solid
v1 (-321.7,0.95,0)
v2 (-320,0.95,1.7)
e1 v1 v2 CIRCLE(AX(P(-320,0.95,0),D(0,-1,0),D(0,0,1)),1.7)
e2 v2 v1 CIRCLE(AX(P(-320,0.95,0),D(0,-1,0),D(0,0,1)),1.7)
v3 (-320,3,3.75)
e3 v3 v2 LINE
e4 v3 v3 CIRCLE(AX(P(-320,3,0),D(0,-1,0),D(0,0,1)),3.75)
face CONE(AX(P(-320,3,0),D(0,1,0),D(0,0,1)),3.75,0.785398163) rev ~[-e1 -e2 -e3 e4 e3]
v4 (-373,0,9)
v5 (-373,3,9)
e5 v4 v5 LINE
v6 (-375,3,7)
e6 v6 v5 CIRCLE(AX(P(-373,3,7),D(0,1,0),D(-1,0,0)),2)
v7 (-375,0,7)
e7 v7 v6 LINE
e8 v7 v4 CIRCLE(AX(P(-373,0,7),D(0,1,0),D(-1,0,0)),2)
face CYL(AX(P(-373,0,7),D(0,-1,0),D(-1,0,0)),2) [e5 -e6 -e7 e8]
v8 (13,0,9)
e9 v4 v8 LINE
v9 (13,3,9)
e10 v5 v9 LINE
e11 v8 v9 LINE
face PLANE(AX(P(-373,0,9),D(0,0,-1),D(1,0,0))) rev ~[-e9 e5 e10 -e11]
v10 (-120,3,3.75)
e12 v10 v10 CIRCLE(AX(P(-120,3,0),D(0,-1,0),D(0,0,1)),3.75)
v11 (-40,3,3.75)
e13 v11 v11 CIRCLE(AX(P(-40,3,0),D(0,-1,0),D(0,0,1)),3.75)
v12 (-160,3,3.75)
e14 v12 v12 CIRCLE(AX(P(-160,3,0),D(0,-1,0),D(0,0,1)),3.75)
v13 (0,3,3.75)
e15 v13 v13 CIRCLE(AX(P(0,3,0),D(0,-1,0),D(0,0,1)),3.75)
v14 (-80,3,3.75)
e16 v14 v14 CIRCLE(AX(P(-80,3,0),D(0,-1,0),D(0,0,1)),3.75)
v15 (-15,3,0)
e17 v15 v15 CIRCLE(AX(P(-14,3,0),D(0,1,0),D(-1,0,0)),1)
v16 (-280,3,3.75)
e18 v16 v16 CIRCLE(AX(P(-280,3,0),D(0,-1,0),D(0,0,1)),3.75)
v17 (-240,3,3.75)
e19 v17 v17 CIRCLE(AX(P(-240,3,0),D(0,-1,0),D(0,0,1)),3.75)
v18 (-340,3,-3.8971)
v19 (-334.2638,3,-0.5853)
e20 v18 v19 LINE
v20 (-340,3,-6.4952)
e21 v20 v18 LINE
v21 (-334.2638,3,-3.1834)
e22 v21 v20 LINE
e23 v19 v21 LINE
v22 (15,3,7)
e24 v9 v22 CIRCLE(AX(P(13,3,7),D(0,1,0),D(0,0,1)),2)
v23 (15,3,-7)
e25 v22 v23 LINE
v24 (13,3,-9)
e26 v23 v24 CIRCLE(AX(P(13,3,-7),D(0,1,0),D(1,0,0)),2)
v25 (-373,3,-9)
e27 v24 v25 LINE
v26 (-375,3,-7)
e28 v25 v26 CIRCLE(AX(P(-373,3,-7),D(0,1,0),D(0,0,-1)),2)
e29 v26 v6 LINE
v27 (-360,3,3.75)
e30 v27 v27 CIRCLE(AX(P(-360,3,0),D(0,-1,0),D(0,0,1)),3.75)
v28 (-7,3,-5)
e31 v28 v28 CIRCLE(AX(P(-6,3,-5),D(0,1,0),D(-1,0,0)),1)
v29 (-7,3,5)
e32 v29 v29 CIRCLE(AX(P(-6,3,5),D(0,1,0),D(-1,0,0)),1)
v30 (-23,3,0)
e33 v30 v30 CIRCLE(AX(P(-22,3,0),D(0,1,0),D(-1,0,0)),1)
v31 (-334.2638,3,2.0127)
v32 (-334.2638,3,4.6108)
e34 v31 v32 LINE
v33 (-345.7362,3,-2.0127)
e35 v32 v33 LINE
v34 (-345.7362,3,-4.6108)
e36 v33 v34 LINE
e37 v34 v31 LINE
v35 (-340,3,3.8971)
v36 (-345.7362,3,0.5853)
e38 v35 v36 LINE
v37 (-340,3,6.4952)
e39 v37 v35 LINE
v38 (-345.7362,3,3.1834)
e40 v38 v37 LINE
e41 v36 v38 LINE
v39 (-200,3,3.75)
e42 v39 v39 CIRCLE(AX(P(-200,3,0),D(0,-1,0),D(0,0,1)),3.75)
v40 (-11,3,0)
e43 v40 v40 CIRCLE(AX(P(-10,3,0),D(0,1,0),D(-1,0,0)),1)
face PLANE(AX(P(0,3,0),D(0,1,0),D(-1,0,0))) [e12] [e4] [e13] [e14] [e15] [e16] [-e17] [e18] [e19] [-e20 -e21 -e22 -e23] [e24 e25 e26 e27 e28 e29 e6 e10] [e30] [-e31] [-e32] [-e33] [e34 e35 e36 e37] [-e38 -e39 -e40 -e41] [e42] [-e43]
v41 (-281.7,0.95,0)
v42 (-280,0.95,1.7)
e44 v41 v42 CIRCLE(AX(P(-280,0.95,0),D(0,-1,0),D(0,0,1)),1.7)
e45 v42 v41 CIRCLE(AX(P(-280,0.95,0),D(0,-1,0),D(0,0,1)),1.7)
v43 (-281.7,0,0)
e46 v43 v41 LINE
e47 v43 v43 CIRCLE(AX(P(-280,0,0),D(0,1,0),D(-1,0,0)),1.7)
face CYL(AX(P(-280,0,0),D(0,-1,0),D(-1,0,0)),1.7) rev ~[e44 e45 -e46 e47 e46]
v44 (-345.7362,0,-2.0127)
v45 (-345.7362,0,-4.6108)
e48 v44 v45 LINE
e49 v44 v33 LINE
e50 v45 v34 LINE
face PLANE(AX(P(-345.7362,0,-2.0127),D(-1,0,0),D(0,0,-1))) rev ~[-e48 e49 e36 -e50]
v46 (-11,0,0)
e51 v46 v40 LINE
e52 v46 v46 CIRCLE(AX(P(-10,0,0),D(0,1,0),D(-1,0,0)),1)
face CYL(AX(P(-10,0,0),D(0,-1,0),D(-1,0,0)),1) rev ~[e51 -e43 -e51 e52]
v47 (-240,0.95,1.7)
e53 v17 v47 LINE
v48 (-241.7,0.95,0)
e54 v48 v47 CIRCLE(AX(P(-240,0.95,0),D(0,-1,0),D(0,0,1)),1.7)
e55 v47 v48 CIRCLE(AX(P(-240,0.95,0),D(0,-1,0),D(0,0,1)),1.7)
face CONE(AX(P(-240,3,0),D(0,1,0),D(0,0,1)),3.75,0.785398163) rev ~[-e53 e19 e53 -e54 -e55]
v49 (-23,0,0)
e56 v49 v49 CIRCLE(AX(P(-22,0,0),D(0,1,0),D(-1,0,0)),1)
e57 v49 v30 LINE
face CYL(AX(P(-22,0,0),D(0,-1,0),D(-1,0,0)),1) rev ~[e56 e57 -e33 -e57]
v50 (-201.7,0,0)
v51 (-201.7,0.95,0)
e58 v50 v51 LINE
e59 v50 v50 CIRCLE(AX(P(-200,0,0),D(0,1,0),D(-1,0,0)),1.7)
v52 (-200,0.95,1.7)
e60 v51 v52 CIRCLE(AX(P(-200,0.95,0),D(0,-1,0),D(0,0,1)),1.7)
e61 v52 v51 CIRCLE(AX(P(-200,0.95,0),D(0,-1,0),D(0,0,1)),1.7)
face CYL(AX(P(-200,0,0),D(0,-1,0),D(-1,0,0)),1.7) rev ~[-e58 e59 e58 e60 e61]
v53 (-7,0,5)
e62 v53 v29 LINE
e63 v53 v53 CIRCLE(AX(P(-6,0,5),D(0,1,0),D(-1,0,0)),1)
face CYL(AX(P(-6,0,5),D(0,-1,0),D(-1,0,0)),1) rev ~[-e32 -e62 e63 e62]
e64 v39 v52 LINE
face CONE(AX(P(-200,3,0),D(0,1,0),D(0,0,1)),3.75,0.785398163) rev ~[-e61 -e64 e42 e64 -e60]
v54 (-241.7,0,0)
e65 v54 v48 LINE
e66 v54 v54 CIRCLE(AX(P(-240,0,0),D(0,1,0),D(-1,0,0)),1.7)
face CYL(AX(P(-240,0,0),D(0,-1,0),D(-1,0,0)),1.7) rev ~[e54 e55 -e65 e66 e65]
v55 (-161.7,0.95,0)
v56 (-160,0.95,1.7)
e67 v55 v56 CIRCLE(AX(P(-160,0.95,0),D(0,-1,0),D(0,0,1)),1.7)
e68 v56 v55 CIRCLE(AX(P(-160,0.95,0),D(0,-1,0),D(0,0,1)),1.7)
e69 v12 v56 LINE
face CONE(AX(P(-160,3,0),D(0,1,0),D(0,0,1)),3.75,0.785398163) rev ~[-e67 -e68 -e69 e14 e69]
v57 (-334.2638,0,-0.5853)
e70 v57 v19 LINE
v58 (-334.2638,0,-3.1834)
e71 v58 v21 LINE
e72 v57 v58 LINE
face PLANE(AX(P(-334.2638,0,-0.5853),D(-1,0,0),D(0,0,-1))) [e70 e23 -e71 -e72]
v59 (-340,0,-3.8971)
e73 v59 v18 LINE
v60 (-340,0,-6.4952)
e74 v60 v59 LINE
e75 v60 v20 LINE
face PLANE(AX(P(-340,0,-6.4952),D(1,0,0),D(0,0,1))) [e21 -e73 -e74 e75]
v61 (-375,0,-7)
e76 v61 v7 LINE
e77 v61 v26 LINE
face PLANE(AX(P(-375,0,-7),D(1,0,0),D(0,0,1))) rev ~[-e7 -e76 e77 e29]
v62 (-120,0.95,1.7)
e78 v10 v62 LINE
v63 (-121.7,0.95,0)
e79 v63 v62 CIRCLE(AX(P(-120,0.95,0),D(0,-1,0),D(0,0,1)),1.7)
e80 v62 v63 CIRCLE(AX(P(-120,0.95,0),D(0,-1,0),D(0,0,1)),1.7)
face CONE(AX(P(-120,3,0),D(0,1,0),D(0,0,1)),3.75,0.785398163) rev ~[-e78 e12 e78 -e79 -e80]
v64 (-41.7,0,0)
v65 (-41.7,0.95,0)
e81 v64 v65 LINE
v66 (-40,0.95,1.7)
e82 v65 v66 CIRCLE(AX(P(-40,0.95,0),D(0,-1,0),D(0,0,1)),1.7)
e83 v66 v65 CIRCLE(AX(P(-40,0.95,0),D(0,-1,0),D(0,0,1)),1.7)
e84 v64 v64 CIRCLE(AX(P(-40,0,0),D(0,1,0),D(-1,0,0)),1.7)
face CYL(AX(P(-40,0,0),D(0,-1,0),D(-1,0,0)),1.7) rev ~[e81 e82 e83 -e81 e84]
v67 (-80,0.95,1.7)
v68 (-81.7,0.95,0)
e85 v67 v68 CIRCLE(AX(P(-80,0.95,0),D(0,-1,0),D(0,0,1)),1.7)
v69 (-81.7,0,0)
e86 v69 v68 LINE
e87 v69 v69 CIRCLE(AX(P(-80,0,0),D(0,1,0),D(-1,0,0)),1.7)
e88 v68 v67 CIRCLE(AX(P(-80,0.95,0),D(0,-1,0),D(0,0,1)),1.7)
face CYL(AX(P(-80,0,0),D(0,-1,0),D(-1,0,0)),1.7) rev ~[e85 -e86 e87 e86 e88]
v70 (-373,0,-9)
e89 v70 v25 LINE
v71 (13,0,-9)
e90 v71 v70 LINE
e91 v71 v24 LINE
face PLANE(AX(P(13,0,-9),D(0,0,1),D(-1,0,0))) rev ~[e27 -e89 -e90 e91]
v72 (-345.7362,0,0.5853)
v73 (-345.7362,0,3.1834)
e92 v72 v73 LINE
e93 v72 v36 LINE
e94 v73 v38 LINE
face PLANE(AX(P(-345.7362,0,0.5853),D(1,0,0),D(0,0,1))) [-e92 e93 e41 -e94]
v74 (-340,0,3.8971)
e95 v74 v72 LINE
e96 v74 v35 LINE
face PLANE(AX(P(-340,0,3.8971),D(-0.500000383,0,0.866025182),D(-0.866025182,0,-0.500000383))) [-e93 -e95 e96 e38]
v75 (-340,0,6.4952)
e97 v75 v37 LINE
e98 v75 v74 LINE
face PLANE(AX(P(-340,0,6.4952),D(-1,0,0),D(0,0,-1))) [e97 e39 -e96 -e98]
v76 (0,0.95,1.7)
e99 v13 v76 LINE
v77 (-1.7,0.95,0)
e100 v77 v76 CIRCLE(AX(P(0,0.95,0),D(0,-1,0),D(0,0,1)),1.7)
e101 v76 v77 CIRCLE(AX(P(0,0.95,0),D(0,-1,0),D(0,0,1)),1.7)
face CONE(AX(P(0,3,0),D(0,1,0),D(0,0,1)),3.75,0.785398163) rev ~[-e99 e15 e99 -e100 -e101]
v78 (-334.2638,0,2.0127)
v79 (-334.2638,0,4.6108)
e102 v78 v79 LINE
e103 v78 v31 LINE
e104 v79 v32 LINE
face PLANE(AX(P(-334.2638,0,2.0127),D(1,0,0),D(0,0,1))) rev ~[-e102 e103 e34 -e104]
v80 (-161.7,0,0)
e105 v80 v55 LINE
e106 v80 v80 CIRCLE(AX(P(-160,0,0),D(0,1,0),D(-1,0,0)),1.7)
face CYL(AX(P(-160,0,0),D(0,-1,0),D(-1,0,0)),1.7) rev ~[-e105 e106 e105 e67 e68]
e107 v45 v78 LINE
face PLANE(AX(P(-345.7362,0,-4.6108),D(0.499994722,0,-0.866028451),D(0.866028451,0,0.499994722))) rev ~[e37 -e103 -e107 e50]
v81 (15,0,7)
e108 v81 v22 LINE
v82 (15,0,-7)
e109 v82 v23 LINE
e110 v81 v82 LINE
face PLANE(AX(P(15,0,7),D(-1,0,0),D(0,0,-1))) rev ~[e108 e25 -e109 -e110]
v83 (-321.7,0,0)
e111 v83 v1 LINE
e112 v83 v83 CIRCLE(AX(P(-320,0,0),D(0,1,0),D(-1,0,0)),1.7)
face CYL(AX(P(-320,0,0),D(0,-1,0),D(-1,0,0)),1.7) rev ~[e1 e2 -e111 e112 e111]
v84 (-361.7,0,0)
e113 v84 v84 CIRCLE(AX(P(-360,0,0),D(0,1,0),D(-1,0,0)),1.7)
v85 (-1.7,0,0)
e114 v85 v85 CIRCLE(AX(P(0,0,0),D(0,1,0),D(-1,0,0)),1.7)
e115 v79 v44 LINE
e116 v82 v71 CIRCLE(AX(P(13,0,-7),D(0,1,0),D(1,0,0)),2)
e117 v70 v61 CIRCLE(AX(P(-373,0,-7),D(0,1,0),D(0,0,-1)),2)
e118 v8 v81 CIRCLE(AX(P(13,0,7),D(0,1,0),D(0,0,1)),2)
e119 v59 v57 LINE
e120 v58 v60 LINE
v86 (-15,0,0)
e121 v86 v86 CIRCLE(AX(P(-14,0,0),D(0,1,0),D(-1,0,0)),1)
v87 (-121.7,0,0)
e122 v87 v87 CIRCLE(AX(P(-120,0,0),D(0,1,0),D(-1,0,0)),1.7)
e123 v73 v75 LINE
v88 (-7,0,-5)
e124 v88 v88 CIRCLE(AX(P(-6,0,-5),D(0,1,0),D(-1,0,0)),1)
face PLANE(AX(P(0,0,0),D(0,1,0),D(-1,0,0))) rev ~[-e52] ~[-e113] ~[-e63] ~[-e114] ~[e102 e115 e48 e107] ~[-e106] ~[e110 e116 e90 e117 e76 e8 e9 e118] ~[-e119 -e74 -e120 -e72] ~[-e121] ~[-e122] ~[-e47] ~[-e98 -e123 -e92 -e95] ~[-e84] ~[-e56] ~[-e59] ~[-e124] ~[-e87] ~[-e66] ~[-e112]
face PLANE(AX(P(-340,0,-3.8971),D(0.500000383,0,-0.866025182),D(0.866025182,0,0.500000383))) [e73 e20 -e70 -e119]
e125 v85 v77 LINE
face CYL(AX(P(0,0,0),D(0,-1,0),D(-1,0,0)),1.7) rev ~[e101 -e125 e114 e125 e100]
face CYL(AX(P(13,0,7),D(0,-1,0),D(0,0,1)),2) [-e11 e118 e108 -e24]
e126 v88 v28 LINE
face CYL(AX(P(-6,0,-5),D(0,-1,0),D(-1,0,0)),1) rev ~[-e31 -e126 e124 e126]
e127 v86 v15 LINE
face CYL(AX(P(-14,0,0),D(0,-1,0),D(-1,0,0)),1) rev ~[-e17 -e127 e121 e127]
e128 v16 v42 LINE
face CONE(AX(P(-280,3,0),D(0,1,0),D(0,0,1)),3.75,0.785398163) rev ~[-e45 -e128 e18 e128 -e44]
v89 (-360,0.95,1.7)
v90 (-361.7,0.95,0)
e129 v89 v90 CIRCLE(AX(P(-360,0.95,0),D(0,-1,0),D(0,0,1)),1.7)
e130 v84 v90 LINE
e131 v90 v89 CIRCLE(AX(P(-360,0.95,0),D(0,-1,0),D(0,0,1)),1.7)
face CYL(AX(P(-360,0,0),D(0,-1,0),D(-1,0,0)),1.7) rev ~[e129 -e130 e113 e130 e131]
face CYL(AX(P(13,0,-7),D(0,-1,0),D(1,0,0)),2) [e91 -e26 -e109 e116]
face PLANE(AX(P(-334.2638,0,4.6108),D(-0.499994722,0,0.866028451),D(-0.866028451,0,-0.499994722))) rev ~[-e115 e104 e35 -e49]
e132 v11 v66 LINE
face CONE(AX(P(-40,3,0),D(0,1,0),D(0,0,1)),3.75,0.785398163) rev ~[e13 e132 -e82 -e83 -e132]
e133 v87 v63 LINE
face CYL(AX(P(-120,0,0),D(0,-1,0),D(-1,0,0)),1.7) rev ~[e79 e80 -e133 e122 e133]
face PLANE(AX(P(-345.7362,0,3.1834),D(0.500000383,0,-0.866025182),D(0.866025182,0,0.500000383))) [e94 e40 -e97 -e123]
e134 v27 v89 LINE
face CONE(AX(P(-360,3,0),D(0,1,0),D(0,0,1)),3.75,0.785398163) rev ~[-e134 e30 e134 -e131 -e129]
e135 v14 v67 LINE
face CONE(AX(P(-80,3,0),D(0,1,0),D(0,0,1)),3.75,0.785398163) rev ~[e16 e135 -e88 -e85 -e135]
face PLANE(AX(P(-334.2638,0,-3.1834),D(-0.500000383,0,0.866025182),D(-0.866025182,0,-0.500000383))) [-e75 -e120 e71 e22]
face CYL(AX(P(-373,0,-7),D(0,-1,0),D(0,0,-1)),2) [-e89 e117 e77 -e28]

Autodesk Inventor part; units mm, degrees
ref_plane "YZ Plane" through (0, 0, 0) normal (1, 0, 0) x (0, 1, 0)
ref_plane "XZ Plane" through (0, 0, 0) normal (0, 1, 0) x (-1, 0, 0)
ref_plane "XY Plane" through (0, 0, 0) normal (0, 0, 1) x (1, 0, 0)
sketch "ExtrusionBacker_Y_350mm_A" plane through (0, 0, 0) normal (0, 0, 1) x (1, 0, 0)
  circle A0 centre (-11.0001, 28.106) radius 1
  circle A1 centre (-11.0001, 38.106) radius 1
  arc A2 (355.9999, 24.106) -> (357.9999, 26.106) centre (355.9999, 26.106) ccw
  line L0 (357.9999, 26.106) -> (357.9999, 40.106)
  arc A3 (357.9999, 40.106) -> (355.9999, 42.106) centre (355.9999, 40.106) ccw
  line L1 (355.9999, 42.106) -> (-30.0001, 42.106)
  arc A4 (-30.0001, 42.106) -> (-32.0001, 40.106) centre (-30.0001, 40.106) ccw
  line L2 (-32.0001, 40.106) -> (-32.0001, 26.106)
  arc A5 (-32.0001, 26.106) -> (-30.0001, 24.106) centre (-30.0001, 26.106) ccw
  line L3 (-30.0001, 24.106) -> (355.9999, 24.106)
  line L4 (322.9999, 37.0031) -> (328.736, 33.6914)
  line L5 (328.736, 33.6914) -> (328.736, 36.2894)
  line L6 (328.736, 36.2894) -> (322.9999, 39.6012)
  line L7 (322.9999, 39.6012) -> (322.9999, 37.0031)
  line L8 (317.2637, 35.1187) -> (317.2637, 37.7168)
  line L9 (317.2637, 37.7168) -> (328.736, 31.0933)
  line L10 (328.736, 31.0933) -> (328.736, 28.4952)
  line L11 (328.736, 28.4952) -> (317.2637, 35.1187)
  line L12 (317.2637, 32.5207) -> (317.2637, 29.9226)
  line L13 (317.2637, 29.9226) -> (322.9999, 26.6108)
  line L14 (322.9999, 26.6108) -> (322.9999, 29.2089)
  line L15 (322.9999, 29.2089) -> (317.2637, 32.5207)
  circle A6 centre (102.9999, 33.106) radius 1.7
  circle A7 centre (142.9999, 33.106) radius 1.7
  circle A8 centre (222.9999, 33.106) radius 1.7
  circle A9 centre (182.9999, 33.106) radius 1.7
  circle A10 centre (62.9999, 33.106) radius 1.7
  circle A11 centre (302.9999, 33.106) radius 1.7
  circle A12 centre (-3.0001, 33.106) radius 1
  circle A13 centre (342.9999, 33.106) radius 1.7
  circle A14 centre (4.9999, 33.106) radius 1
  circle A15 centre (-17.0001, 33.106) radius 1.7
  circle A16 centre (22.9999, 33.106) radius 1.7
  circle A17 centre (262.9999, 33.106) radius 1.7
  circle A18 centre (-7.0001, 33.106) radius 1
sketch "Skizze1" plane through (0, 0, 0) normal (0, 1, 0) x (-1, 0, 0)
  circle A0 centre (6, -5) radius 1
  circle A1 centre (6, 5) radius 1
  arc A2 (373, -9) -> (375, -7) centre (373, -7) ccw
  line L0 (375, -7) -> (375, 7)
  arc A3 (375, 7) -> (373, 9) centre (373, 7) ccw
  line L1 (373, 9) -> (-13, 9)
  arc A4 (-13, 9) -> (-15, 7) centre (-13, 7) ccw
  line L2 (-15, 7) -> (-15, -7)
  arc A5 (-15, -7) -> (-13, -9) centre (-13, -7) ccw
  line L3 (-13, -9) -> (373, -9)
  line L4 (340, 3.8971) -> (345.7362, 0.5853)
  line L5 (345.7362, 0.5853) -> (345.7362, 3.1834)
  line L6 (345.7362, 3.1834) -> (340, 6.4952)
  line L7 (340, 6.4952) -> (340, 3.8971)
  line L8 (334.2638, 2.0127) -> (334.2638, 4.6108)
  line L9 (334.2638, 4.6108) -> (345.7362, -2.0127)
  line L10 (345.7362, -2.0127) -> (345.7362, -4.6108)
  line L11 (345.7362, -4.6108) -> (334.2638, 2.0127)
  line L12 (334.2638, -0.5853) -> (334.2638, -3.1834)
  line L13 (334.2638, -3.1834) -> (340, -6.4952)
  line L14 (340, -6.4952) -> (340, -3.8971)
  line L15 (340, -3.8971) -> (334.2638, -0.5853)
  circle A6 centre (120, 0) radius 1.7
  circle A7 centre (160, 0) radius 1.7
  circle A8 centre (240, 0) radius 1.7
  circle A9 centre (200, 0) radius 1.7
  circle A10 centre (80, 0) radius 1.7
  circle A11 centre (320, 0) radius 1.7
  circle A12 centre (14, 0) radius 1
  circle A13 centre (360, 0) radius 1.7
  circle A14 centre (22, 0) radius 1
  circle A15 centre (0, 0) radius 1.7
  circle A16 centre (40, 0) radius 1.7
  circle A17 centre (280, 0) radius 1.7
  circle A18 centre (10, 0) radius 1
  point P0 (373, -9)
  point P1 (375, 7)
  point P2 (373, 9)
  point P3 (-13, 9)
  point P4 (-15, 7)
  point P5 (-15, -7)
  point P6 (-13, -9)
  point P7 (334.2638, 2.0127)
  point P8 (334.2638, 4.6108)
  point P9 (345.7362, -2.0127)
  point P10 (345.7362, -4.6108)
  point P11 (340, 3.8971)
  point P12 (340, 6.4952)
  point P13 (345.7362, 0.5853)
  point P14 (340, -3.8971)
  point P15 (340, -6.4952)
  point P16 (334.2638, -3.1834)
  point P17 (334.2638, -0.5853)
extrude "Extrusion1" add sketch "Skizze1" along normal blind 3
sketch "Skizze2" plane through (0, 3, 0) normal (0, 1, 0) x (1, 0, 0)
  circle A0 centre (-360, 0) radius 1.7 projected
  circle A1 centre (-320, 0) radius 1.7 projected
  circle A2 centre (-280, 0) radius 1.7 projected
  circle A3 centre (-240, 0) radius 1.7 projected
  circle A4 centre (-200, 0) radius 1.7 projected
  circle A5 centre (-160, 0) radius 1.7 projected
  circle A6 centre (-120, 0) radius 1.7 projected
  circle A7 centre (-80, 0) radius 1.7 projected
  circle A8 centre (-40, 0) radius 1.7 projected
  circle A9 centre (0, 0) radius 1.7 projected
hole "Bohrung1" at (-360, 3, 0) at (-320, 3, 0) at (-280, 3, 0) at (-240, 3, 0) at (-200, 3, 0) at (-160, 3, 0) at (-120, 3, 0) at (-80, 3, 0) at (-40, 3, 0) at (0, 3, 0) direction (0, -1, 0) diameter 3.4 end through all countersink diameter 7.5 countersink angle 90 clearance for "Innensechskant-Senkkopfschraube DIN EN ISO 10642" size "M3" standard "DIN"
properties part number "Y Extrusion-Backer [A] (350mm)" material "Titan"
